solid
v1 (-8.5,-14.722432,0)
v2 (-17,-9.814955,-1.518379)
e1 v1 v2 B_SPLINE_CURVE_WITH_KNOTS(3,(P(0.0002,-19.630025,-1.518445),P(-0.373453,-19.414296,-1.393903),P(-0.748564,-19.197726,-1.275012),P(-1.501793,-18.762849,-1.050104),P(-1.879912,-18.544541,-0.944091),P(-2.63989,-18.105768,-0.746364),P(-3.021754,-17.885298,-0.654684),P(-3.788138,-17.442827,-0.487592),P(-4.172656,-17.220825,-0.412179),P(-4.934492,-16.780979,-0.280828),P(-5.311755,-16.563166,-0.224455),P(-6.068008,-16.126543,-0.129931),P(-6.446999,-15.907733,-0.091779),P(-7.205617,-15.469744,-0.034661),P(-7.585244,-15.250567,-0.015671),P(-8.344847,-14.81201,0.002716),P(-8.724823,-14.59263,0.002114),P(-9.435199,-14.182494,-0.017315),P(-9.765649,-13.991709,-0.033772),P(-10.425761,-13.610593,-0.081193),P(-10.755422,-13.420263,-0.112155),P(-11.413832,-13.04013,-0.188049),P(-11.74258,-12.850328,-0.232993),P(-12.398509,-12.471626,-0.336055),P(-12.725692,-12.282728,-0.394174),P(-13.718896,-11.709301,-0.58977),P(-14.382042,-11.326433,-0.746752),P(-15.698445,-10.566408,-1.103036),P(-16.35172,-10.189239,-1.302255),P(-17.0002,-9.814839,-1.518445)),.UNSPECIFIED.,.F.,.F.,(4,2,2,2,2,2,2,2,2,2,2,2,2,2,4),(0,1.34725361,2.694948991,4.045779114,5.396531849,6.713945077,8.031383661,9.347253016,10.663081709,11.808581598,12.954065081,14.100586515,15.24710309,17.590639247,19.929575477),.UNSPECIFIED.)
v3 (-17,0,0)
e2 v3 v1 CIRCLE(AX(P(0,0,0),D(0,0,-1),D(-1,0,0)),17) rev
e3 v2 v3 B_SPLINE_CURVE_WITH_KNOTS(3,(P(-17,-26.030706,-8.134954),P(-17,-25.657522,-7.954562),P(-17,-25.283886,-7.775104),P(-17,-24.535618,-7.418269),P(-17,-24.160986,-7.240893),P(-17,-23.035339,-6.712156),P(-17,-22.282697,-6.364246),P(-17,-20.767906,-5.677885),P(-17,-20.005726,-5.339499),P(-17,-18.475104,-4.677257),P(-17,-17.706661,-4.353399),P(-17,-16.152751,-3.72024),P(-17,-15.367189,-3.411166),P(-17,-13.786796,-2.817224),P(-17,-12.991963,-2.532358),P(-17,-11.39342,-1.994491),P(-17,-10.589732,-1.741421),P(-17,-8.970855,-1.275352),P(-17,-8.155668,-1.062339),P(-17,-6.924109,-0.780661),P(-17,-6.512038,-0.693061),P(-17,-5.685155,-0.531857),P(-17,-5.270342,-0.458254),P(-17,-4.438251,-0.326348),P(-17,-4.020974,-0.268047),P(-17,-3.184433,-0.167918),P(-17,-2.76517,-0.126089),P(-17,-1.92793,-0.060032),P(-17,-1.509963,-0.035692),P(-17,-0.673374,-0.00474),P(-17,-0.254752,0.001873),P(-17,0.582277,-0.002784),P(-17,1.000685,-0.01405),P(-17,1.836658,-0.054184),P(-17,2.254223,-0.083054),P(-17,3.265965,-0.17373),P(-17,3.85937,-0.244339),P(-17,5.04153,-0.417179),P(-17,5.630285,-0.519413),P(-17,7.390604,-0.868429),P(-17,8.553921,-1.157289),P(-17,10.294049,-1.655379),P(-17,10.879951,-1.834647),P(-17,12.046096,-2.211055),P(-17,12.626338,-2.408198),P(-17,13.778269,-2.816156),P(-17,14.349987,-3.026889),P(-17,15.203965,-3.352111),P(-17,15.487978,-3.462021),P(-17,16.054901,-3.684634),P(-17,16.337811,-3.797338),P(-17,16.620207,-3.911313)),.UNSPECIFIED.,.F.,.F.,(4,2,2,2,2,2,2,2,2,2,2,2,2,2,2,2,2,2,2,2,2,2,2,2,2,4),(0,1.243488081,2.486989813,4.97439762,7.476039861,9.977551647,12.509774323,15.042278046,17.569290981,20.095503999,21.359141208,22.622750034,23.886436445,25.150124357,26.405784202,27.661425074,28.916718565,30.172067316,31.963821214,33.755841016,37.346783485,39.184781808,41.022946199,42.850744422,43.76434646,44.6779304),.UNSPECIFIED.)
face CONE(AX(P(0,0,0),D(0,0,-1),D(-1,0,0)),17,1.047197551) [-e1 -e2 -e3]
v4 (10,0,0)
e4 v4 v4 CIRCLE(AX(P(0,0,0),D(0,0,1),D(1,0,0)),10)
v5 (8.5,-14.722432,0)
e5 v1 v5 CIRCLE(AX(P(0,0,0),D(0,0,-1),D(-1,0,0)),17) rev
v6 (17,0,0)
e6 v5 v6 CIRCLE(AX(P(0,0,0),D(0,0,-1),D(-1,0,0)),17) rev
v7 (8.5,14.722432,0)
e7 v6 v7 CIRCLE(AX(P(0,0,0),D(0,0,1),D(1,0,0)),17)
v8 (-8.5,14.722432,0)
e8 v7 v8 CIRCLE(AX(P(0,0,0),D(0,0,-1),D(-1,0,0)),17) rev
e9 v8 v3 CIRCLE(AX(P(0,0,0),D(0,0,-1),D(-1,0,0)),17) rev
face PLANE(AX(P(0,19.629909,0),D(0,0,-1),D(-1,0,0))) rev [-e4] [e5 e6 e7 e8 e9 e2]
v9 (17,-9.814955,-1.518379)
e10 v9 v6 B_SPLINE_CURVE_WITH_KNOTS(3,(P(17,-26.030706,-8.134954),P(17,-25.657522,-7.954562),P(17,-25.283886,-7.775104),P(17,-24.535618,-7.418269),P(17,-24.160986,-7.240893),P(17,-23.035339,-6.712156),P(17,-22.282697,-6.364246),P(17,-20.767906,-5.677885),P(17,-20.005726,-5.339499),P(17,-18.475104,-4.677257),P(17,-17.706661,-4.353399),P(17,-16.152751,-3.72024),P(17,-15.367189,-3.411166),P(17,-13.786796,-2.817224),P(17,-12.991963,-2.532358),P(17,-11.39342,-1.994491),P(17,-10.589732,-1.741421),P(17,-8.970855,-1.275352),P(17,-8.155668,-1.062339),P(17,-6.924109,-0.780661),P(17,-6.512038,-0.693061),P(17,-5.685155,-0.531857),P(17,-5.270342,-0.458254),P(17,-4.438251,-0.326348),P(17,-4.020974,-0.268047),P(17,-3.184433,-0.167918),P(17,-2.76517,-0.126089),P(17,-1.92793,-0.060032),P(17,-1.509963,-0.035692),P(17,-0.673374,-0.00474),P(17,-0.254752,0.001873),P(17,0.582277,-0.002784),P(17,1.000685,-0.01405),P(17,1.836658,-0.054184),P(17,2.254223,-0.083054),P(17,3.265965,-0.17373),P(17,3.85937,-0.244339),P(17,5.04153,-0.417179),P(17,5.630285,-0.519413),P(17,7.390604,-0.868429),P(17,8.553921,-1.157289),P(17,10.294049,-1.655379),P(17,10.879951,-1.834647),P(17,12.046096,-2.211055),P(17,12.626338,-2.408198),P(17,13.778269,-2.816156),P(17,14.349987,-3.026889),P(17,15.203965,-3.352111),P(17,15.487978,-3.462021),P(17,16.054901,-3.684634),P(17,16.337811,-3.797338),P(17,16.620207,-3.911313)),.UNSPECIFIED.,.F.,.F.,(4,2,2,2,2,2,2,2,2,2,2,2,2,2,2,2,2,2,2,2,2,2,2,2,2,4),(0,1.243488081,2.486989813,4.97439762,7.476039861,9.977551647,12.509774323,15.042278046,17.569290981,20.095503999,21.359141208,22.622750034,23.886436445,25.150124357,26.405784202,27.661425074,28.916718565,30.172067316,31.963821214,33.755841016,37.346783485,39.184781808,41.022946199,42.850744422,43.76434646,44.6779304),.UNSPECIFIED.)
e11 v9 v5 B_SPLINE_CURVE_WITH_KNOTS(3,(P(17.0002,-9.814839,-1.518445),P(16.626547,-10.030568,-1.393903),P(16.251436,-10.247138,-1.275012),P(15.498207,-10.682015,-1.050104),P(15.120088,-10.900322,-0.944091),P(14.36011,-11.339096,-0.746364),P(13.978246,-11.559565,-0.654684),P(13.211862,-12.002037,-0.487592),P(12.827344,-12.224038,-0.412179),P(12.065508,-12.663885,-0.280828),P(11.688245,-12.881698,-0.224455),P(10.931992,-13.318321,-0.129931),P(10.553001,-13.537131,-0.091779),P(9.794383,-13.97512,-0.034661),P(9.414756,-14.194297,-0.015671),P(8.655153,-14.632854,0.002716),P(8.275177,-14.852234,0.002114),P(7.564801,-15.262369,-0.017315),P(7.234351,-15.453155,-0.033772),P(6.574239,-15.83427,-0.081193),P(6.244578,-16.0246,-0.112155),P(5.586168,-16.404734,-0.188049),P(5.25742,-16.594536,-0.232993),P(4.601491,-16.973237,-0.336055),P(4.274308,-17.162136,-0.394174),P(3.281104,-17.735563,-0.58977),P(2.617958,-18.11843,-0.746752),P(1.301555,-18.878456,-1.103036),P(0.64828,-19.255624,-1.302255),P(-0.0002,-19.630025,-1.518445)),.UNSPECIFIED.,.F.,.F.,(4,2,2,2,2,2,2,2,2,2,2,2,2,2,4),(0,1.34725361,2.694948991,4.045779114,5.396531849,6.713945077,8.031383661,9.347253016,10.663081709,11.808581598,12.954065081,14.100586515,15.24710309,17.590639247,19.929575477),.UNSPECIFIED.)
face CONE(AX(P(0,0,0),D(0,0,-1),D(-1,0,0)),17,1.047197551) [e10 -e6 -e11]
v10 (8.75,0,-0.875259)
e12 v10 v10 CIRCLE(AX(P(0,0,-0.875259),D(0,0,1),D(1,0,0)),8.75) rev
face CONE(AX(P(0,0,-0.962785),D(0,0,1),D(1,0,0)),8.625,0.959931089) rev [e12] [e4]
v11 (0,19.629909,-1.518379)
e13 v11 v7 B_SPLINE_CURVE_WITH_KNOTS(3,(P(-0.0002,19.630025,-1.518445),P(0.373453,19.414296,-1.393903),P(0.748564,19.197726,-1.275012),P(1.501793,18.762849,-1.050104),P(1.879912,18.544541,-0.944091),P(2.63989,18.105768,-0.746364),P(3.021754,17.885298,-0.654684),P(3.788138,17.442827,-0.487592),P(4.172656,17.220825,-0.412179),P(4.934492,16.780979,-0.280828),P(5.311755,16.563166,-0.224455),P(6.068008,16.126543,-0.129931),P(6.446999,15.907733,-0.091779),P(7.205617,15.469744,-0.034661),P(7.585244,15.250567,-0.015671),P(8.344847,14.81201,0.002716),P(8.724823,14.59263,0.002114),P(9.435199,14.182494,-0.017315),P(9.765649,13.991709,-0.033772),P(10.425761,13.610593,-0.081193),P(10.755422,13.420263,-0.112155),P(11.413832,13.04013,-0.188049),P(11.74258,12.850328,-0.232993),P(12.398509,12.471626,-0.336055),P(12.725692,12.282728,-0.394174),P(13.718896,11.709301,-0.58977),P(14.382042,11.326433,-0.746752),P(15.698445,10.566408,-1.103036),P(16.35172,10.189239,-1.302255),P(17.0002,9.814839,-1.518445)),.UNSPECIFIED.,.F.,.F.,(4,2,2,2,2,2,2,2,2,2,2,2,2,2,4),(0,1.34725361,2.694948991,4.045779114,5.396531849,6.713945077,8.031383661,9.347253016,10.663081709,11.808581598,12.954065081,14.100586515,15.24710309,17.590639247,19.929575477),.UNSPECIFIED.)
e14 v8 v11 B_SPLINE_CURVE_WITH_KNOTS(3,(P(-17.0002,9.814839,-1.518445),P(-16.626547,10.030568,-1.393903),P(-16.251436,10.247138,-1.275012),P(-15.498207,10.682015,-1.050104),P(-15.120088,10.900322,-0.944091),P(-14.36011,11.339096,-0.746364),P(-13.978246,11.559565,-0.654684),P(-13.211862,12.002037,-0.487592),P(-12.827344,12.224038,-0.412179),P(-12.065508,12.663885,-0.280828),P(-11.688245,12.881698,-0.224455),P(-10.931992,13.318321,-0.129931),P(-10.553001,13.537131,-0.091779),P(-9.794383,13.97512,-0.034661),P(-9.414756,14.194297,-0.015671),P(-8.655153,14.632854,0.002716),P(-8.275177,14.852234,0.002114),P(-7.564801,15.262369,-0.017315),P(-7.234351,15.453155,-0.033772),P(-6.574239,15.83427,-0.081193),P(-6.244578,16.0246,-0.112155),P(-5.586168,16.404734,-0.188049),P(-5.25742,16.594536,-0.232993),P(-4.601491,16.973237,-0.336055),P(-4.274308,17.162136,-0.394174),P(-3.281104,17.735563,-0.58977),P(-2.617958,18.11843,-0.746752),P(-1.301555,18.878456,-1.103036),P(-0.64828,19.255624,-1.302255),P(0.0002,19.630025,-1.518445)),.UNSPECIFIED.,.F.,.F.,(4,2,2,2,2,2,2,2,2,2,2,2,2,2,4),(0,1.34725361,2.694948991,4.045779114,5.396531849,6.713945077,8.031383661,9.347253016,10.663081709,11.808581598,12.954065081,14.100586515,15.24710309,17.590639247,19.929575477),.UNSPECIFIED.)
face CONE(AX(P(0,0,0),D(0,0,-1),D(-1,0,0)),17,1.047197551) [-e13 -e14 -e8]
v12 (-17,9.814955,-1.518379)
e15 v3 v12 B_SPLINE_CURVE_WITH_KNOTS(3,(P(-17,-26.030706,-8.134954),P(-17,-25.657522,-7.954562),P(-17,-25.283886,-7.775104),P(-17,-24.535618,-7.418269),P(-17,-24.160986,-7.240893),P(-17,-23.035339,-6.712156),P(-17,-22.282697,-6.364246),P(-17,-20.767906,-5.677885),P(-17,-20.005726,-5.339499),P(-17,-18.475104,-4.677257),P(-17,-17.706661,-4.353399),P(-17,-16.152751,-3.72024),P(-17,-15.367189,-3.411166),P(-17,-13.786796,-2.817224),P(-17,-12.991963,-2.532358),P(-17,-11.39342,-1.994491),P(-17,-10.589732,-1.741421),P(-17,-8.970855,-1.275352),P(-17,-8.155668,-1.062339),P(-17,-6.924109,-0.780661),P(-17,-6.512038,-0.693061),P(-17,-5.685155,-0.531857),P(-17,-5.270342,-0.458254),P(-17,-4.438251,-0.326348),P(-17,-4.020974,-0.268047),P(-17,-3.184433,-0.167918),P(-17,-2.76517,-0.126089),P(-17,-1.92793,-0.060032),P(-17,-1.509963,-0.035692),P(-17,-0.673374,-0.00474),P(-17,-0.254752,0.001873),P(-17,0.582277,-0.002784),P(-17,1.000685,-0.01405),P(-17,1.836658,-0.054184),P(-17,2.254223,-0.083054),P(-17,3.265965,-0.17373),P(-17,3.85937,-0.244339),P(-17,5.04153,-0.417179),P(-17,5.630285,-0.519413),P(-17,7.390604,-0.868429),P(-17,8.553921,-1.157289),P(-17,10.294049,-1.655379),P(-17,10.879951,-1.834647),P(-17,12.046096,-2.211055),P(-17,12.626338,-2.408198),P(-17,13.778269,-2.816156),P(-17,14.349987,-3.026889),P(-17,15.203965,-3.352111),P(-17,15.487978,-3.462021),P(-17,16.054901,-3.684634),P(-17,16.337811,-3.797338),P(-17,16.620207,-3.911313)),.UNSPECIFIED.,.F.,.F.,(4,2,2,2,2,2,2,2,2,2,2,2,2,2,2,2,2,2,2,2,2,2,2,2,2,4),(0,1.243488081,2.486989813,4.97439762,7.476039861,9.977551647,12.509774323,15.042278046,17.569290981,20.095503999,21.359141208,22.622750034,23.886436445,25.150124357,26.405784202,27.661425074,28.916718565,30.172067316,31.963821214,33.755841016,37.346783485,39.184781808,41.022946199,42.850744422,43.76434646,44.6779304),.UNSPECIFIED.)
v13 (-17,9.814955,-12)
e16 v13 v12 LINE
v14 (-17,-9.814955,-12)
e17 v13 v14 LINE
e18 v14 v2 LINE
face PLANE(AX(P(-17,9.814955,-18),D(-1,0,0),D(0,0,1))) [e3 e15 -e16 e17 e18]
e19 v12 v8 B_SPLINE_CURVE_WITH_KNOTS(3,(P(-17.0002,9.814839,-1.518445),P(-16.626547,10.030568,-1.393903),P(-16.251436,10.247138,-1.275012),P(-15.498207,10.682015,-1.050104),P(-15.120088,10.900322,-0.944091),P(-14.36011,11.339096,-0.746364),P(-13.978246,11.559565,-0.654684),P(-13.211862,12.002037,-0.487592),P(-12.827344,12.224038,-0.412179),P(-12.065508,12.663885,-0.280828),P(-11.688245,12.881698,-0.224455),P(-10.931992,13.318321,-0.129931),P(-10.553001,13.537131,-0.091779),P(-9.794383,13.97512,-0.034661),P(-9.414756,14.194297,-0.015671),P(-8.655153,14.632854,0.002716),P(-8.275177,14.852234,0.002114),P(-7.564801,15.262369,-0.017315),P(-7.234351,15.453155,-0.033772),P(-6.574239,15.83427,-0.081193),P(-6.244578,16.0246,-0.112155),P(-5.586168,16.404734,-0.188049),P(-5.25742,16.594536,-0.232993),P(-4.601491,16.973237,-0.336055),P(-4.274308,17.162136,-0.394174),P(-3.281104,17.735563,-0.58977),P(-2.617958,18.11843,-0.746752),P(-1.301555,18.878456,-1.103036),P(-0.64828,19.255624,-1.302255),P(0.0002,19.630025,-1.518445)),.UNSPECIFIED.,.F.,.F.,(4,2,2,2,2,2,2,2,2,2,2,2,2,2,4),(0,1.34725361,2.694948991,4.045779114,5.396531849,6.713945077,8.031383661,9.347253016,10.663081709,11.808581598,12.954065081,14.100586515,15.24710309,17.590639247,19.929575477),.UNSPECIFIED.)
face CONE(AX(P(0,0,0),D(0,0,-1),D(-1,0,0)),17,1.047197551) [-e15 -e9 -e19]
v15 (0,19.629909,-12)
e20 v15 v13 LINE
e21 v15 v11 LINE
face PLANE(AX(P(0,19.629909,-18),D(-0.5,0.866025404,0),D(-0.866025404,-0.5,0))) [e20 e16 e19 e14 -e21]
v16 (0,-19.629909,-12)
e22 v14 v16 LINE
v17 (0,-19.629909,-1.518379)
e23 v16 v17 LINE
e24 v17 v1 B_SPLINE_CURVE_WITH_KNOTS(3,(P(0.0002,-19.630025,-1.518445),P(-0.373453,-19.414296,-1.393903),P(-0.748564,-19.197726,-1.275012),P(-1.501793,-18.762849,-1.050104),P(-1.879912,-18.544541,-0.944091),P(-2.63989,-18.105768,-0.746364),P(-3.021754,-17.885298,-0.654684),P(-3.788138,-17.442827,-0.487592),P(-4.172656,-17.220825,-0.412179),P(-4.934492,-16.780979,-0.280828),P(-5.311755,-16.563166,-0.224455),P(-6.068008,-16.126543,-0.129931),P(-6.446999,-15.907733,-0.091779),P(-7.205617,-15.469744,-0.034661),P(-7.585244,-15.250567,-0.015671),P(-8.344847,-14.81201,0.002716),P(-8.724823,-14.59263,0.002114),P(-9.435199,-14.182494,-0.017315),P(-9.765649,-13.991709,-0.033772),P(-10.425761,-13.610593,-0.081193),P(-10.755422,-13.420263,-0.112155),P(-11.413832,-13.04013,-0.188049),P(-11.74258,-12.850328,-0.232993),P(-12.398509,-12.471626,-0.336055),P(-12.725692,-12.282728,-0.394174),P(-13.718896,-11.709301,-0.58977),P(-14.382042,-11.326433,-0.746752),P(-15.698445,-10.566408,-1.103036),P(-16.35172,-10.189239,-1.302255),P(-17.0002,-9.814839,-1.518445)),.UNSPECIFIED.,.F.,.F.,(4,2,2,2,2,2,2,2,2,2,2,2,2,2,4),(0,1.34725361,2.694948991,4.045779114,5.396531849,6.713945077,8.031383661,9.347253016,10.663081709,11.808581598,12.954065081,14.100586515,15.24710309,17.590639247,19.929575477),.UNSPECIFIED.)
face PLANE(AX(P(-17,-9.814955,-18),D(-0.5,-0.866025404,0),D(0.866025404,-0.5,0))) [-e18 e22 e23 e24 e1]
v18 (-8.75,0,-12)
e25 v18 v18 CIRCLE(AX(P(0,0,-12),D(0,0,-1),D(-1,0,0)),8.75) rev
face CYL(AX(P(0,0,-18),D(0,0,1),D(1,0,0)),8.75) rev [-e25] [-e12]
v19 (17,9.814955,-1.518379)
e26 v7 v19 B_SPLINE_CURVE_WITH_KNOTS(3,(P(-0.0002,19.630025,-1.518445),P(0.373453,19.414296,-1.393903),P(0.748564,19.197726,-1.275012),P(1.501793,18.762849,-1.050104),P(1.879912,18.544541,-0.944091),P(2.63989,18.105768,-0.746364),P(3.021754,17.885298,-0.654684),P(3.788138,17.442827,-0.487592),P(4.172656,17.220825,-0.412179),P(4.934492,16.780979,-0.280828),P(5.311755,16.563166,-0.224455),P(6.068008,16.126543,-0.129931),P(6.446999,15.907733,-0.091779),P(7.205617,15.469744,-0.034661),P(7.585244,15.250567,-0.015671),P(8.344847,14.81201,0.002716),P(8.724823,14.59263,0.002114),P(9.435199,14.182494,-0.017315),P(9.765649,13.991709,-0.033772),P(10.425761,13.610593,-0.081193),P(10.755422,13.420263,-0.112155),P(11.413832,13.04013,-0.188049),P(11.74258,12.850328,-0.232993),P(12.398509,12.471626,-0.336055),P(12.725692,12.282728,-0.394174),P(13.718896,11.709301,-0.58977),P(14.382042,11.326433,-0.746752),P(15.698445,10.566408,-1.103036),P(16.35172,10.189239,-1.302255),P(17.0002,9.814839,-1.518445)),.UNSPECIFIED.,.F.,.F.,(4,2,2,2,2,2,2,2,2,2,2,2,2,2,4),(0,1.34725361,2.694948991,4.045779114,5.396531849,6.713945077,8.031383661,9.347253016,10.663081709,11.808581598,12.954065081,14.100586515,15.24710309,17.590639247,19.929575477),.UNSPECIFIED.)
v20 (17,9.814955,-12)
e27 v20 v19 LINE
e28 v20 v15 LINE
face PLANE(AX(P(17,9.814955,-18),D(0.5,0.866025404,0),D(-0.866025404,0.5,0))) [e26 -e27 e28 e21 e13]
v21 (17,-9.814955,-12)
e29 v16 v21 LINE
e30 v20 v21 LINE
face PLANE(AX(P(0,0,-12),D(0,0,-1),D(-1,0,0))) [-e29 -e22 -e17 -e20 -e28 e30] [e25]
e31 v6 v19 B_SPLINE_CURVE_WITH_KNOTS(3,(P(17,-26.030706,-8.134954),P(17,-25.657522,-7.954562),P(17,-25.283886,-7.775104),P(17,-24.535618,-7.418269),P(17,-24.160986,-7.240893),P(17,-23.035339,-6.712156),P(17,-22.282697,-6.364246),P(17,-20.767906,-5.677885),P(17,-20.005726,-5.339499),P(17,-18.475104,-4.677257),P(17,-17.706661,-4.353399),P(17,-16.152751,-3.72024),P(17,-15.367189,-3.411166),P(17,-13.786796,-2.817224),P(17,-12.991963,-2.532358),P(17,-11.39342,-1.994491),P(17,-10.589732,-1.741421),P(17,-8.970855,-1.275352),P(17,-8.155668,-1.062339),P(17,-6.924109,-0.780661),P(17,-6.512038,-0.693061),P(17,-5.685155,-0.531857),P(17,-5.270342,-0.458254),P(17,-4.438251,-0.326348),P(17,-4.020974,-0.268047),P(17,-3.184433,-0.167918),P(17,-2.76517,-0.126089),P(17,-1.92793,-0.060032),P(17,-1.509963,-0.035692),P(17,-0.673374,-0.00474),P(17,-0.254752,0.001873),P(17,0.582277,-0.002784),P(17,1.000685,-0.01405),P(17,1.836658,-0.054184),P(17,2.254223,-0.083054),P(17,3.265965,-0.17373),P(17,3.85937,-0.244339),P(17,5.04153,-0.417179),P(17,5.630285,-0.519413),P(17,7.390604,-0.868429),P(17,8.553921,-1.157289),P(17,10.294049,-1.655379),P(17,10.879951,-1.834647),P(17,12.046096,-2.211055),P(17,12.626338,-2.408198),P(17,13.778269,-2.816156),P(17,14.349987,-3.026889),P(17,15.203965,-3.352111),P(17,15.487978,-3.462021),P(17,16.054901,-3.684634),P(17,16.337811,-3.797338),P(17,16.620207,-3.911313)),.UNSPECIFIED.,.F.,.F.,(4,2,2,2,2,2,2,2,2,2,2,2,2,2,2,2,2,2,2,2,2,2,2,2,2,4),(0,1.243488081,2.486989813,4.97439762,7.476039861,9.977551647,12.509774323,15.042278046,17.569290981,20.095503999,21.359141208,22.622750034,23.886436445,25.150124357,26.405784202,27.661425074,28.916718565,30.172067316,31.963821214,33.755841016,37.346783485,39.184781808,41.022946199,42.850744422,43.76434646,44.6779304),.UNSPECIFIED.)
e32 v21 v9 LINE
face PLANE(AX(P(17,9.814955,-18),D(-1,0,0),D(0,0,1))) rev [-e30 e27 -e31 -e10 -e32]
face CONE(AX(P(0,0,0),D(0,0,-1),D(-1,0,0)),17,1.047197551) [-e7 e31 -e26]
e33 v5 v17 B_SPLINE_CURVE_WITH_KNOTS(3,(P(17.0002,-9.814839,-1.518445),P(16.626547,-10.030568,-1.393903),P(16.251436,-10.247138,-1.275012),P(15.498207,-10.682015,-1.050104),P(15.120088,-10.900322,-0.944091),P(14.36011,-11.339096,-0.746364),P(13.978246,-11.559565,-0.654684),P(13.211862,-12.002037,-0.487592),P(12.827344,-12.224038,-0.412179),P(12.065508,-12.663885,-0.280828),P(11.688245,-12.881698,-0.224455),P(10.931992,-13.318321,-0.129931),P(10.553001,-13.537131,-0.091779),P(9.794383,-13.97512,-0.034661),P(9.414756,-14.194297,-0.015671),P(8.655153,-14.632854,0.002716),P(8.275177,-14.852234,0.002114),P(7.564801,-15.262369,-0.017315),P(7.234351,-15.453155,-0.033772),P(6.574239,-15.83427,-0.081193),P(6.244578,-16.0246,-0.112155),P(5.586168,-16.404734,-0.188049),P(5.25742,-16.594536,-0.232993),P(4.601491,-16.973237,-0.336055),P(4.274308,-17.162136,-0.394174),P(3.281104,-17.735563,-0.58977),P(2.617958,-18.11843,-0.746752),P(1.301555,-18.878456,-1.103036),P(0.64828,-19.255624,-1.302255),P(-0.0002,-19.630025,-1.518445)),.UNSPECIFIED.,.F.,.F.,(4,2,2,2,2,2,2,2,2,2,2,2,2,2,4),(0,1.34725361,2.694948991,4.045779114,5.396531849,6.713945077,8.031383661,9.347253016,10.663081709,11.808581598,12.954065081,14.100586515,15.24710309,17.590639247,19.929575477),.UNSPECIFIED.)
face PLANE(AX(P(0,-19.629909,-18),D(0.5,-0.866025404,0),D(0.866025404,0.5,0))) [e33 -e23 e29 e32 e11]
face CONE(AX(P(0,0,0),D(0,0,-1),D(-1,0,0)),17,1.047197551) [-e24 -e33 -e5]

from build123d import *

# Parameters (mm, degrees)
BASENUT_START         = -18
BASENUTSKE_R          = 8.75
BASENUT_DEPTH         = 18
SKETCH4_W             = 0.8
SKETCH4_H             = 12.629909152
IZIM1_W               = 62.269157962
IZIM1_H               = 48.757925573
KES_EKSTR_ZYON1_DEPTH = 6


# Read off the part's stored shape, not the designer's step: ThreadSchematic
with BuildPart() as part:
    # BaseNutSke → BaseNut (new body)
    with BuildSketch(Plane.XY.offset(BASENUT_START)):
        Polygon((17, 9.814954576), (17, -9.814954576), (0, -19.629909152), (-17, -9.814954576), (-17, 9.814954576), (0, 19.629909152), align=None)
        Circle(BASENUTSKE_R, mode=Mode.SUBTRACT)
    extrude(amount=BASENUT_DEPTH)

    # Sketch5 (on Front Plane) → EndChamfer (revolve, cut)
    with BuildSketch(Plane.XY):
        Polygon((17.9746, 10), (17.011814635, 8.625), (18.0254, 8.625), (18.0254, 10), align=None)
    revolve(axis=Axis((17.9746, 10, 0), (-0.5735764363510453, -0.8191520442889925, 0)), mode=Mode.SUBTRACT)

    # Sketch4 → Bearing-Face (revolve, cut)
    with BuildSketch(Plane(origin=(0, 0, 0), x_dir=(0, 0, -1), z_dir=(1, 0, 0)), mode=Mode.PRIVATE) as bearing_face_sk:
        with Locations((17.6, 23.314954576)):
            Rectangle(SKETCH4_W, SKETCH4_H)
        Polygon((0, 17), (-10, 17), (-10, 29.629909152), (1.518378757, 29.629909152), (1.518378757, 19.629909152), align=None)
    revolve(bearing_face_sk.sketch.rotate(Axis((0, 0, 0), (0, 0, -1)), 270), axis=Axis((0, 0, 0), (0, 0, -1)), mode=Mode.SUBTRACT)

    # ThreadSchematic outline → ThreadSchematic (revolve, cut)
    with BuildSketch(Plane.XZ):
        Polygon((8.75, 0), (8.75, -0.875259423), (10, 0), align=None)
        Polygon((10, -17.9746), (8.75, -17.099340577), (8.75, -18), (10, -18), align=None)
    revolve(axis=Axis((0, 0, 0), (0, 0, 1)), mode=Mode.SUBTRACT)

    # Çizim1 → Kes-Ekstrüzyon1 (cut)
    with BuildSketch(Plane(origin=(0, 0, -18), x_dir=(-1, 0, 0), z_dir=(0, 0, -1))):
        with Locations((0.923127679, 2.056057103)):
            Rectangle(IZIM1_W, IZIM1_H)
    extrude(amount=-KES_EKSTR_ZYON1_DEPTH, mode=Mode.SUBTRACT)


solid = part.part
